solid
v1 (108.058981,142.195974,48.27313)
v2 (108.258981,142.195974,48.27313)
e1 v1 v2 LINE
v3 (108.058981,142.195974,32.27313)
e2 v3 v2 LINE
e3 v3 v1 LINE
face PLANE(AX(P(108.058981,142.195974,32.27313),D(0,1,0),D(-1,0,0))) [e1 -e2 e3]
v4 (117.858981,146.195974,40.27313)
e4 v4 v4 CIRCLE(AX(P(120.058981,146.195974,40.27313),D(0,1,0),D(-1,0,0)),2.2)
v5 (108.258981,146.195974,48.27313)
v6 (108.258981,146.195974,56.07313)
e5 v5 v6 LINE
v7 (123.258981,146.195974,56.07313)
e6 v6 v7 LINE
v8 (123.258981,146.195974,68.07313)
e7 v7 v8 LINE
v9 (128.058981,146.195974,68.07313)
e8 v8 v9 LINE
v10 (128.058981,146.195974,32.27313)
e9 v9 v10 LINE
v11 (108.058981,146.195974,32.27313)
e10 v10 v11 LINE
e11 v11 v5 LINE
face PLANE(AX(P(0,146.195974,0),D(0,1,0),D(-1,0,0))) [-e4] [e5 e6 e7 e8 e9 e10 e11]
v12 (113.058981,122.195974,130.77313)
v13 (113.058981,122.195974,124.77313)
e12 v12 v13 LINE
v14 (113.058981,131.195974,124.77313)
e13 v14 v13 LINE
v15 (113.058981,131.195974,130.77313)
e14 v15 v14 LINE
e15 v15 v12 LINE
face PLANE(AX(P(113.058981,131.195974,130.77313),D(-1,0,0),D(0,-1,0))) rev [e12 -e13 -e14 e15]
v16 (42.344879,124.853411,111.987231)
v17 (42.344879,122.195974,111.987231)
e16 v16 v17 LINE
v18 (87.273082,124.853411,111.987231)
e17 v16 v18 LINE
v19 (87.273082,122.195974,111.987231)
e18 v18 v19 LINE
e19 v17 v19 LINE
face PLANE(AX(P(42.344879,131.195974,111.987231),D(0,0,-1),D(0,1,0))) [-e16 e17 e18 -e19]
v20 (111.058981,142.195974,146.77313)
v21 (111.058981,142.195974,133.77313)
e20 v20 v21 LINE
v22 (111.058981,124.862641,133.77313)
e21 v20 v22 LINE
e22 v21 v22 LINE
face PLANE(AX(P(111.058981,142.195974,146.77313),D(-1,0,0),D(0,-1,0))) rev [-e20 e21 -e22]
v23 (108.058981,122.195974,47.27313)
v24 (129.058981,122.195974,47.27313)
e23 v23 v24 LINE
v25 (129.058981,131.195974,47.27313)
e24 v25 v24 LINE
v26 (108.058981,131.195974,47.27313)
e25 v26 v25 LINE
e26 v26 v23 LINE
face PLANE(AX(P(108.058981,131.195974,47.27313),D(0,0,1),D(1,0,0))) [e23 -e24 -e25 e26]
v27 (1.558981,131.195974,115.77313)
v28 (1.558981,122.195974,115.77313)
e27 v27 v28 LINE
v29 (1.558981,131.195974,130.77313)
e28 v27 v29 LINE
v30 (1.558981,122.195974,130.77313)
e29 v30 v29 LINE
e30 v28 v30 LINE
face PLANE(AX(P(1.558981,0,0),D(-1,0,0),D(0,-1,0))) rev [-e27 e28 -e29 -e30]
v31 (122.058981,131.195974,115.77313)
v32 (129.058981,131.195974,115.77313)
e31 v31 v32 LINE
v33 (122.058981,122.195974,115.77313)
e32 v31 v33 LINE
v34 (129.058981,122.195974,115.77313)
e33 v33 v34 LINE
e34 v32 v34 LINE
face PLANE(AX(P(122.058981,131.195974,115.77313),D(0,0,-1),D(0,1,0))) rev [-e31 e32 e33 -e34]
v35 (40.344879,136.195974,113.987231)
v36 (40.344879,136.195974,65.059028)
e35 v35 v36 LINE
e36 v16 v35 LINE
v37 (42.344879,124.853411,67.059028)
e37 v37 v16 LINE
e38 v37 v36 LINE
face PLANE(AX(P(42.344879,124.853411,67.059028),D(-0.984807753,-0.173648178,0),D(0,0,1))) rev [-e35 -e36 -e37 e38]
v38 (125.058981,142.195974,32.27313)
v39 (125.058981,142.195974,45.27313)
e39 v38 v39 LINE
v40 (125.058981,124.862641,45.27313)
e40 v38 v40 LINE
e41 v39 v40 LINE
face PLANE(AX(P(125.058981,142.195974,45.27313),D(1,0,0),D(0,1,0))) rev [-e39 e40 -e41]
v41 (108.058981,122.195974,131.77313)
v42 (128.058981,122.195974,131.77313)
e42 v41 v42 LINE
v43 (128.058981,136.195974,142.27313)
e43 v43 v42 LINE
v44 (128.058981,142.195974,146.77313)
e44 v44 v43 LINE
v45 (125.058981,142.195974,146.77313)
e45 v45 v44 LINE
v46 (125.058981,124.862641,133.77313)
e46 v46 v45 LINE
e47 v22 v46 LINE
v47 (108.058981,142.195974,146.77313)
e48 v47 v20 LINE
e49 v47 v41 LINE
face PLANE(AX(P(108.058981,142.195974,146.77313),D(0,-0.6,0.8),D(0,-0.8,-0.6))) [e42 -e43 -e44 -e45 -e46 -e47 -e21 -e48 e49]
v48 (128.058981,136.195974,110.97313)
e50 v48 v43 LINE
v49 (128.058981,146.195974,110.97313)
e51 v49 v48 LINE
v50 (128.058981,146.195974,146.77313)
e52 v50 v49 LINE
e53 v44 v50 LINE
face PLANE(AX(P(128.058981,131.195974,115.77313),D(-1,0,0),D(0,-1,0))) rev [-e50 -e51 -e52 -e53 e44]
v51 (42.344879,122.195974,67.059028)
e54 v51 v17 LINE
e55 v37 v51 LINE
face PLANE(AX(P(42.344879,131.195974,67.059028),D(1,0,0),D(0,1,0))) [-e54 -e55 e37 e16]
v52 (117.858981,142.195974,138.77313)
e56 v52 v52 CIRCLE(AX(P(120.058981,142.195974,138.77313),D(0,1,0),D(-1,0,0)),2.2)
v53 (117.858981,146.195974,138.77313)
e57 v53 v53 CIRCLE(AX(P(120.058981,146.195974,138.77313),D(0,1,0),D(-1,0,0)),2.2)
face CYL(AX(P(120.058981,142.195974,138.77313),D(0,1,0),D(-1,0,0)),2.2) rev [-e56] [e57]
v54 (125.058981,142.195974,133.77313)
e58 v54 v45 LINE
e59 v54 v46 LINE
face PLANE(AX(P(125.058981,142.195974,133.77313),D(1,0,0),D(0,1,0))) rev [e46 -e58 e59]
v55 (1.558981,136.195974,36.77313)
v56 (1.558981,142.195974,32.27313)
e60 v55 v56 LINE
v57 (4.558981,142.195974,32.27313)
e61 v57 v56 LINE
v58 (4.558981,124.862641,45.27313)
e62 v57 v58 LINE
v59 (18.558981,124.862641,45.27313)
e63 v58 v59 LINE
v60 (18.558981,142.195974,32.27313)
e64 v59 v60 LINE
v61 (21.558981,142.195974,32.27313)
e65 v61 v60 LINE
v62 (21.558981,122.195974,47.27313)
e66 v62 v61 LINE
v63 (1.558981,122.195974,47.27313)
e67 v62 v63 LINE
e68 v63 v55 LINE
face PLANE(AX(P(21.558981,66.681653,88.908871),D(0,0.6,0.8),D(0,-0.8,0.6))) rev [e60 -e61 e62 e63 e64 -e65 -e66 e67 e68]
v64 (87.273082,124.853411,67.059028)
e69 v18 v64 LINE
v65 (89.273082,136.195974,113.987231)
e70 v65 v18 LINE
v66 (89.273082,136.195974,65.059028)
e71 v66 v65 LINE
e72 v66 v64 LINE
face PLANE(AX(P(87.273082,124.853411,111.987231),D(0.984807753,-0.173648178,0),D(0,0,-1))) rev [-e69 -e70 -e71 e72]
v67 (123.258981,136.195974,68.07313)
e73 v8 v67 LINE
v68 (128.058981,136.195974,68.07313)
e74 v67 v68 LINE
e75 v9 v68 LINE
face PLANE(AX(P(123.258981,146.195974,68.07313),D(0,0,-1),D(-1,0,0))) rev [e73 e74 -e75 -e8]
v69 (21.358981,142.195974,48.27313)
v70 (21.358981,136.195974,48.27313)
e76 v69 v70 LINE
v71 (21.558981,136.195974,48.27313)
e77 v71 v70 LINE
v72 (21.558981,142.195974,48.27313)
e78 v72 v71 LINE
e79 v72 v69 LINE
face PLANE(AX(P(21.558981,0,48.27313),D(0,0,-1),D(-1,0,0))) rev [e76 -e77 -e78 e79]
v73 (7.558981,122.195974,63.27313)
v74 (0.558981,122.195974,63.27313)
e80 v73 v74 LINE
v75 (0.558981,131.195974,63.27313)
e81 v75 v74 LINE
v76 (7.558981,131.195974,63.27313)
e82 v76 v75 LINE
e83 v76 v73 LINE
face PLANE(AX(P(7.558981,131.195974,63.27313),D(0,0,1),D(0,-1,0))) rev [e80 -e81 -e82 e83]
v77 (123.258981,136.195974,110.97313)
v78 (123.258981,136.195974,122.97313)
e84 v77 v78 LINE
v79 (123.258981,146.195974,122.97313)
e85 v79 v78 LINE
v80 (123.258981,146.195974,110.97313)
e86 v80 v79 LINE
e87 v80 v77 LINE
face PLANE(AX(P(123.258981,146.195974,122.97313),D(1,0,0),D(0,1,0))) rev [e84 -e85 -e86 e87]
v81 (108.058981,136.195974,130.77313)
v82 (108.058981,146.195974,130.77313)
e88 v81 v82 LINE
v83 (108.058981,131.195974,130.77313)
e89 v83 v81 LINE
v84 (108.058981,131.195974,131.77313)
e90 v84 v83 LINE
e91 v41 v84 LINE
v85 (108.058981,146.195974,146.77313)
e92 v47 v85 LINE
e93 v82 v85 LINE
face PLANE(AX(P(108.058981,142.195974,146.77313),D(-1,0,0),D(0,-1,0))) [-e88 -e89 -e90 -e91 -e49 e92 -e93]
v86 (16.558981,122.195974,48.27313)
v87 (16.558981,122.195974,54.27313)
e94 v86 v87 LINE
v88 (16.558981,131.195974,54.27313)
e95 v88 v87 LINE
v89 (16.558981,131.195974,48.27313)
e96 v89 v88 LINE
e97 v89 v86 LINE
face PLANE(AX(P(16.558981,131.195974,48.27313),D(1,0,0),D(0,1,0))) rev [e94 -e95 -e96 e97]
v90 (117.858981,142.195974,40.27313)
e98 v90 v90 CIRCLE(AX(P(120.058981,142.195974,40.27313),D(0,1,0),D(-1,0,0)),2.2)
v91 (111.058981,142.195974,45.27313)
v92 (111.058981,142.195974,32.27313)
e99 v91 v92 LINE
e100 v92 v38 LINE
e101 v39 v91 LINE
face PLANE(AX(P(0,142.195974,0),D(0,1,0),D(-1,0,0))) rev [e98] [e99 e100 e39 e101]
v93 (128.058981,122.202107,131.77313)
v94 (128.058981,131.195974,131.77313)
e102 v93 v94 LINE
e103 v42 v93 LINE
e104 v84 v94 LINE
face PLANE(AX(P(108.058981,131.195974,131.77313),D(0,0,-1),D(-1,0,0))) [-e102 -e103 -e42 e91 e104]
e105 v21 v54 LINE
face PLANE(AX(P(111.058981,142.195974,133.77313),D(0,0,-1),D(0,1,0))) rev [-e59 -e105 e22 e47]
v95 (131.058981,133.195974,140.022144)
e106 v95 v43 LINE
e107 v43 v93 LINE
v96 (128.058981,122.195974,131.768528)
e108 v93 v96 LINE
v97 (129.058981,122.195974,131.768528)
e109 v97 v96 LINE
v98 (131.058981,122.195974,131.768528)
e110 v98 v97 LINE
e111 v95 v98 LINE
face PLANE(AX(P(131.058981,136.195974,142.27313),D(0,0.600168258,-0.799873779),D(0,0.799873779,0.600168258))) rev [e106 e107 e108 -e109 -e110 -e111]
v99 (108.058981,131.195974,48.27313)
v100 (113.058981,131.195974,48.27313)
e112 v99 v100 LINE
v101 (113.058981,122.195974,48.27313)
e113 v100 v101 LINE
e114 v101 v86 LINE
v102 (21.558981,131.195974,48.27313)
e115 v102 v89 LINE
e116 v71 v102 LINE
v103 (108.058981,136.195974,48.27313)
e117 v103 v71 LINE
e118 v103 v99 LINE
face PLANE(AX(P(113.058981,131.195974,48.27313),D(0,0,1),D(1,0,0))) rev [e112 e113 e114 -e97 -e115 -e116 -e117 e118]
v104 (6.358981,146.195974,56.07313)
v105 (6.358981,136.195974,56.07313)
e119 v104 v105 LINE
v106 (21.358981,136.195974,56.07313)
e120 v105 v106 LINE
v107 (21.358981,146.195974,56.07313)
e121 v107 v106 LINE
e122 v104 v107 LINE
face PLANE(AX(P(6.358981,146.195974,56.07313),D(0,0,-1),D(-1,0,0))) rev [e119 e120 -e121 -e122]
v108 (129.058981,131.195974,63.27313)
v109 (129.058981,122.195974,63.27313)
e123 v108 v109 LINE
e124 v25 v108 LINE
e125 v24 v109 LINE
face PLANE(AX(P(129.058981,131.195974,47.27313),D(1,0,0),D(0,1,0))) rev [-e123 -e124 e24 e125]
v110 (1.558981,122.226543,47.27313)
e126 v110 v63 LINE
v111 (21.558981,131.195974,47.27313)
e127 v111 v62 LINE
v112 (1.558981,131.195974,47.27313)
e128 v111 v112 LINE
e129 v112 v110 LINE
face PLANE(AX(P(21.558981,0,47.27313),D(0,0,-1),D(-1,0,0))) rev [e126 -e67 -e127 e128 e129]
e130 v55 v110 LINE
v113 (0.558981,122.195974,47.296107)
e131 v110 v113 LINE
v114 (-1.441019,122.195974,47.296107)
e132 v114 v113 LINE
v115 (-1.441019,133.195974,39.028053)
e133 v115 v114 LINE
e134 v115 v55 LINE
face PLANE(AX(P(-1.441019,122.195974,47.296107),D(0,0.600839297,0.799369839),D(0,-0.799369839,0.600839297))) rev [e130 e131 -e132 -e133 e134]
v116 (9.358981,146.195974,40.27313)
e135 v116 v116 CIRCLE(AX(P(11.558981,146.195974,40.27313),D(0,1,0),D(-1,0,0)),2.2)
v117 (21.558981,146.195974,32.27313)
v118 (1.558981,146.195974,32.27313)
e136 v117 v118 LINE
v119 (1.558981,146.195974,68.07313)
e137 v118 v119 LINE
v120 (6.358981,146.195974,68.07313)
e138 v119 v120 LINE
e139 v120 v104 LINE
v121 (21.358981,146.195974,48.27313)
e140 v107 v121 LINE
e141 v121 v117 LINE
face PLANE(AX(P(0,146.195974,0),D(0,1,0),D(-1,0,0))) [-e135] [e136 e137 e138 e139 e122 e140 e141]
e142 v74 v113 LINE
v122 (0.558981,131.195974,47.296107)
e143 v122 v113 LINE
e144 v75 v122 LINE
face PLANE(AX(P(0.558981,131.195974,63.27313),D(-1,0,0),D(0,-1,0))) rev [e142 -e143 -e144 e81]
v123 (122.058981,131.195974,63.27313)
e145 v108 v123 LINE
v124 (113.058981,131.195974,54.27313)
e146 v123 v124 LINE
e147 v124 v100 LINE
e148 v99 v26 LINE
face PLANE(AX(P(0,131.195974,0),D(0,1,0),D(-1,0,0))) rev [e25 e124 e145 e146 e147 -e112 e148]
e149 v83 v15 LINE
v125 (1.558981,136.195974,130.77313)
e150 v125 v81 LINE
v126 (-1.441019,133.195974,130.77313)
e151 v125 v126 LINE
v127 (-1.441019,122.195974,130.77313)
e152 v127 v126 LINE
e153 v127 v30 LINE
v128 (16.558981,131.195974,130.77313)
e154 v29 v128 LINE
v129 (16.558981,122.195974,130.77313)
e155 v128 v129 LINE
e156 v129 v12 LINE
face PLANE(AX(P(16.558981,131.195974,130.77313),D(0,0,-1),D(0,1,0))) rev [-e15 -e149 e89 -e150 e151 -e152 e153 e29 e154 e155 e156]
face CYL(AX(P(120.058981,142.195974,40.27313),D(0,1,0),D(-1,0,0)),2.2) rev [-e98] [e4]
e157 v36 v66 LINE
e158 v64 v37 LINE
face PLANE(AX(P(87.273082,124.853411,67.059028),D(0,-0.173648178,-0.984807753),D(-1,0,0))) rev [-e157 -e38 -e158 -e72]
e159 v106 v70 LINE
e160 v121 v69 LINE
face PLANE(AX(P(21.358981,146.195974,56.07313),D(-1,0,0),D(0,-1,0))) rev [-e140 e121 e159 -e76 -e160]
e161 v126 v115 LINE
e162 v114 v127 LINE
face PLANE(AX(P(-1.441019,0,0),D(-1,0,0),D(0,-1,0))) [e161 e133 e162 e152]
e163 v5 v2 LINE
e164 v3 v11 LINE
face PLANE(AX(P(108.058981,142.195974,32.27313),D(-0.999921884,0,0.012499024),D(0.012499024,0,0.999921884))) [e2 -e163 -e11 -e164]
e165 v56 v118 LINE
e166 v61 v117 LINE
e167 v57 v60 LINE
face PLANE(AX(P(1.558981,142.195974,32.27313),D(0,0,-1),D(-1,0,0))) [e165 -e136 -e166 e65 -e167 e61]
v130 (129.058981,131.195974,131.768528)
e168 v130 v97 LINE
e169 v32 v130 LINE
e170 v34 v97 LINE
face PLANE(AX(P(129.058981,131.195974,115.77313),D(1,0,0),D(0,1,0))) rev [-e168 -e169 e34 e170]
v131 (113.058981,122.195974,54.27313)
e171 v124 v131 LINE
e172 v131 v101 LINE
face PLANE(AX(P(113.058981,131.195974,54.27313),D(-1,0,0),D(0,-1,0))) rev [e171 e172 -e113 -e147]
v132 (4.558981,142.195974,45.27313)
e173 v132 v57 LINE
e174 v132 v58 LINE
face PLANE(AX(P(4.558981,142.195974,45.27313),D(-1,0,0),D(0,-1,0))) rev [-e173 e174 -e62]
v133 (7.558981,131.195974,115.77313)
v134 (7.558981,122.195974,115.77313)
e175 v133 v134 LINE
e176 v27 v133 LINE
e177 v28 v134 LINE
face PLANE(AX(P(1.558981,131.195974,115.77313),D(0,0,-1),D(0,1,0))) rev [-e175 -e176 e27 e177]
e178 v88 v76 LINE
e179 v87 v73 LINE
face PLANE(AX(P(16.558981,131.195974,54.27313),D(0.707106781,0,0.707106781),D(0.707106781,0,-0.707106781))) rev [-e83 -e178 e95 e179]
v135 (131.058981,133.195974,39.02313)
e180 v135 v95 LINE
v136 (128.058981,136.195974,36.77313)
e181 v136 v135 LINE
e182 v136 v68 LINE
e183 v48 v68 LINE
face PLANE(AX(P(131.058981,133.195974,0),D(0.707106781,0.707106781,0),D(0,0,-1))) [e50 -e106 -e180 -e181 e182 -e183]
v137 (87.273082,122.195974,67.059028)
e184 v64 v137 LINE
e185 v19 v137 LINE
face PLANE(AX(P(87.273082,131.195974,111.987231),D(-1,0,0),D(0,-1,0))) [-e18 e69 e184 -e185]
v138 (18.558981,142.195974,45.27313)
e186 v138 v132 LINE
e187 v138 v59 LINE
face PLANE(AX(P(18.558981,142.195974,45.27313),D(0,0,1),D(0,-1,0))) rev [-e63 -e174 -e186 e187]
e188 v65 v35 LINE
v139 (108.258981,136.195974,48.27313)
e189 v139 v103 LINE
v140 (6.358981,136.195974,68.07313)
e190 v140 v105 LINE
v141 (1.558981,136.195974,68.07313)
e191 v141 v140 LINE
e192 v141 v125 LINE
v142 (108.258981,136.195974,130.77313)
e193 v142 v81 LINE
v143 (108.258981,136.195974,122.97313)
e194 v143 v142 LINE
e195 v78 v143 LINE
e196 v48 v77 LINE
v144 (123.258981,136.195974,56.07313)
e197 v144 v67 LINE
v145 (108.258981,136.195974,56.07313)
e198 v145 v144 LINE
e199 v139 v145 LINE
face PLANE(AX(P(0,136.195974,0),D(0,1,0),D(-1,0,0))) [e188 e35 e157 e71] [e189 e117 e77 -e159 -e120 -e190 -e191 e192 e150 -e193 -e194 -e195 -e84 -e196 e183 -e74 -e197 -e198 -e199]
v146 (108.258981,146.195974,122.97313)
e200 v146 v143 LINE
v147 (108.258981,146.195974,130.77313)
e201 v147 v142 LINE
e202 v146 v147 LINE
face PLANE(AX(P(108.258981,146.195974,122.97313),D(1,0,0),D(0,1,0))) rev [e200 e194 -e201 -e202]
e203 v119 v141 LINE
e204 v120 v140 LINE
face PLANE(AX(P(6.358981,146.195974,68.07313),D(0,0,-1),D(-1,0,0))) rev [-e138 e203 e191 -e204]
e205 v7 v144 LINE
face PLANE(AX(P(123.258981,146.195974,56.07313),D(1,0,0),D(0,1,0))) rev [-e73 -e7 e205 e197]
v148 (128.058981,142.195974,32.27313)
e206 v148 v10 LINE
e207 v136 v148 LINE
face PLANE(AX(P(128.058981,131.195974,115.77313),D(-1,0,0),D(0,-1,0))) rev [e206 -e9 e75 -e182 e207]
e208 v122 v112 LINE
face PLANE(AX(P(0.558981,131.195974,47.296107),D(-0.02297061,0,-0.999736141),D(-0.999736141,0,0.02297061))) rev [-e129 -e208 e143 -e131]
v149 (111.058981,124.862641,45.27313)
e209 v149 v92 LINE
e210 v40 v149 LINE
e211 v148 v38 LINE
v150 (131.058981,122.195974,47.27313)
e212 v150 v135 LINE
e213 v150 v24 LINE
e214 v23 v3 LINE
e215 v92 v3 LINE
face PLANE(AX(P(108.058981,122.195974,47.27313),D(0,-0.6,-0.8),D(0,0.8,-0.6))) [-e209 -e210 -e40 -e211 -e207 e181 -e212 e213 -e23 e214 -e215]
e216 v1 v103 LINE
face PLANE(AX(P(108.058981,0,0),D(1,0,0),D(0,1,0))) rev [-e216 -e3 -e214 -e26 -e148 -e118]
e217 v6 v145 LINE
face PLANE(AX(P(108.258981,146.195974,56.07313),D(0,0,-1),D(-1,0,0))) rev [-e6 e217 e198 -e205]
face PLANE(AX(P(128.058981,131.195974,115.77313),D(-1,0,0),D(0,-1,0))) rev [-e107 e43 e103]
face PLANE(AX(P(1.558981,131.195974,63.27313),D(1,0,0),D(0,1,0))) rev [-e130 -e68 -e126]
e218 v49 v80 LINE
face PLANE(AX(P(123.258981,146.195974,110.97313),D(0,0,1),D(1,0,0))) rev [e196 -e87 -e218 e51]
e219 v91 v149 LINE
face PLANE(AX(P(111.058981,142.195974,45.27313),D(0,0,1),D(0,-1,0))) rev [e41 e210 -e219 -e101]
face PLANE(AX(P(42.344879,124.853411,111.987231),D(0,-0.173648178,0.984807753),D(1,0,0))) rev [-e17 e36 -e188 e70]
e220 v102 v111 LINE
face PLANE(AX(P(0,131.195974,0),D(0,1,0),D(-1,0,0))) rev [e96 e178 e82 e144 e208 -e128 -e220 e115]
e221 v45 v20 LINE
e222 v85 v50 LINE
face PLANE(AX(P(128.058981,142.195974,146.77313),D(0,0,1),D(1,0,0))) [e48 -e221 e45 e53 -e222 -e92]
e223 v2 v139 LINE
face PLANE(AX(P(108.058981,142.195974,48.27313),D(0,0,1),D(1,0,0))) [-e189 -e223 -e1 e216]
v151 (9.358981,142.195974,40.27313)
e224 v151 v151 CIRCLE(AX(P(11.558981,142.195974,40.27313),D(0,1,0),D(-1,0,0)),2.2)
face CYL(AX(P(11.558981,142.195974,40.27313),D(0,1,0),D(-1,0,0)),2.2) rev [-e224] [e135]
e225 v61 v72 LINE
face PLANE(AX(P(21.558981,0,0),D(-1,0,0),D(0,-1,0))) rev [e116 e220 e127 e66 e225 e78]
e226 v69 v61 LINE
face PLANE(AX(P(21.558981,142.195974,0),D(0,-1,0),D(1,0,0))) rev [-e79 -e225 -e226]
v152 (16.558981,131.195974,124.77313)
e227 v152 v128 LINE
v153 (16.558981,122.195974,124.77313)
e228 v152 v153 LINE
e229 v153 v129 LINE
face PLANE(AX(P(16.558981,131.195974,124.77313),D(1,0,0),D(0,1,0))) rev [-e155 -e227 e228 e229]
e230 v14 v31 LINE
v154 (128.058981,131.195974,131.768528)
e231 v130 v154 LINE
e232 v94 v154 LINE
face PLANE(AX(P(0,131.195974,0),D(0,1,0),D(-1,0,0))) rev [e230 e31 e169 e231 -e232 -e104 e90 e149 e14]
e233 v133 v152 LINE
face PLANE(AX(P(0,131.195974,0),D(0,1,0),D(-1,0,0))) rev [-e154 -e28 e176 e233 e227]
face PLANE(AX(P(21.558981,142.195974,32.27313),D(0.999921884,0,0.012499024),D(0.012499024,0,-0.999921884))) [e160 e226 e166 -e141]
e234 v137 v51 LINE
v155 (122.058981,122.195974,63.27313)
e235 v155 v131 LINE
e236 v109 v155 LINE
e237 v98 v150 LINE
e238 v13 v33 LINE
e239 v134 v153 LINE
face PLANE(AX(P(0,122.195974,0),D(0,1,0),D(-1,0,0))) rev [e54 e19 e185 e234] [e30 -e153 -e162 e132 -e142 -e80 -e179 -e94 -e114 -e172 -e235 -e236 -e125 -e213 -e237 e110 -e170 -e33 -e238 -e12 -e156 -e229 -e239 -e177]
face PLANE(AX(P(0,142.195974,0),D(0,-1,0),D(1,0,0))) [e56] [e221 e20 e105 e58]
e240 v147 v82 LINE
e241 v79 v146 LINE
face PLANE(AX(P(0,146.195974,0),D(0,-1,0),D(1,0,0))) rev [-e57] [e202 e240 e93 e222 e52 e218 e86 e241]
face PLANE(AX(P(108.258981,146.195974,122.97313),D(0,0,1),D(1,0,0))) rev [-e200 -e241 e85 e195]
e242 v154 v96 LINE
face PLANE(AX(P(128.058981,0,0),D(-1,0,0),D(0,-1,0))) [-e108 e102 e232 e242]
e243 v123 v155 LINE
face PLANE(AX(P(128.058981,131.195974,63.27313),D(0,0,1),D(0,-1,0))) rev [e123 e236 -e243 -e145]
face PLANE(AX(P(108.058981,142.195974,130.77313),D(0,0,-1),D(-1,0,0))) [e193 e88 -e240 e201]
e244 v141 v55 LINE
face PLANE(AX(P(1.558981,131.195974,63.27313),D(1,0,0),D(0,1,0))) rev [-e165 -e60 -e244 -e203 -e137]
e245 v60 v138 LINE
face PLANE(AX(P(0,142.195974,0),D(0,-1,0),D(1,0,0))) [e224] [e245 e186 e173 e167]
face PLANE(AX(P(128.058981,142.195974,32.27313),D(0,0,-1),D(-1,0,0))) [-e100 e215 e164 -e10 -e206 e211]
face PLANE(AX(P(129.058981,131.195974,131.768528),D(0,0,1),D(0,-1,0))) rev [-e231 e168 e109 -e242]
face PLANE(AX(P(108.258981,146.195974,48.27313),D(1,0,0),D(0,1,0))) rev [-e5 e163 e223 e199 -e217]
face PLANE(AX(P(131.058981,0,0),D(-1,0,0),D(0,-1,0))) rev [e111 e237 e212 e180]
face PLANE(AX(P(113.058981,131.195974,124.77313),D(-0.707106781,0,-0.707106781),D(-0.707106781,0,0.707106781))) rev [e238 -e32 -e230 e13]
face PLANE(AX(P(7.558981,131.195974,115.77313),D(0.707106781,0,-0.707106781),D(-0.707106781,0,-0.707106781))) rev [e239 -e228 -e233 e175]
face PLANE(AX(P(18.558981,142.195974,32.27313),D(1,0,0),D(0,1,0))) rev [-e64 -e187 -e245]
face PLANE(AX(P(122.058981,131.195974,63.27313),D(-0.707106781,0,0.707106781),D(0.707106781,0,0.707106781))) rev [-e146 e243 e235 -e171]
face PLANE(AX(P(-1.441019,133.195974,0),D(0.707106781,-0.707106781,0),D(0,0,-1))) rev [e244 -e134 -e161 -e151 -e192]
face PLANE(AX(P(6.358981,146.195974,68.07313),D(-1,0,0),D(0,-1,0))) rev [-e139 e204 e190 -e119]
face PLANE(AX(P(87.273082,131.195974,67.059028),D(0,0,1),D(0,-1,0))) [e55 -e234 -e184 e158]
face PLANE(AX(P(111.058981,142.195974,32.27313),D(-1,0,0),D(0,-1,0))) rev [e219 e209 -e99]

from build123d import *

# Parameters (mm, degrees)
SKETCH_1_W          = 44.92820323
SKETCH_1_H          = 44.928203231
EXTRUDE_1_DEPTH     = 9
SKETCH_2_W          = 126.5
SKETCH_2_H          = 82.5
SKETCH_2_W_2        = 44.92820323
SKETCH_2_H_2        = 44.928203231
EXTRUDE_2_DEPTH     = 5
CHAMFER_1_SIZE      = 2
CHAMFER_1_SIZE2     = 11.342563639
EXTRUDE_3_DEPTH     = 10
SKETCH_4_W          = 20
SKETCH_4_H          = 16
SKETCH_4_R          = 2.2
EXTRUDE_4_DEPTH     = 4
EXTRUDE_5_DEPTH     = 20
EXTRUDE_6_DEPTH     = 20
SKETCH_7_W          = 14
SKETCH_7_H          = 13
CUT_EXTRUDE_1_DEPTH = 20
EXTRUDE_7_DEPTH     = 3
EXTRUDE_8_DEPTH     = 3
CHAMFER_2_SIZE      = 3
SKETCH_10_W         = 1
SKETCH_10_H         = 16
SKETCH_10_H_2       = 15.995398116
CUT_EXTRUDE_2_DEPTH = 9


with BuildPart() as part:
    # Эскиз1 → Бобышка-Вытянуть1 (new body)
    with BuildSketch(Plane(origin=(0, 122.195974268, 0), x_dir=(1, 0, 0), z_dir=(0, 1, 0))):
        Polygon((16.558980694, -48.273129836), (16.558980694, -54.273129836), (7.558980694, -63.273129836), (1.558980694, -63.273129836), (1.558980694, -115.773129836), (7.558980694, -115.773129836), (16.558980694, -124.773129836), (16.558980694, -130.773129836), (113.058980694, -130.773129836), (113.058980694, -124.773129836), (122.058980694, -115.773129836), (128.058980694, -115.773129836), (128.058980694, -63.273129836), (122.058980694, -63.273129836), (113.058980694, -54.273129836), (113.058980694, -48.273129836), align=None)
        with Locations((64.808980694, -89.523129837)):
            Rectangle(SKETCH_1_W, SKETCH_1_H, mode=Mode.SUBTRACT)
    extrude(amount=EXTRUDE_1_DEPTH)

    # Эскиз2 → Бобышка-Вытянуть2 (add)
    with BuildSketch(Plane(origin=(0, 131.195974268, 0), x_dir=(1, 0, 0), z_dir=(0, 1, 0))):
        with Locations((64.808980694, -89.523129836)):
            Rectangle(SKETCH_2_W, SKETCH_2_H)
        with Locations((64.808980694, -89.523129837)):
            Rectangle(SKETCH_2_W_2, SKETCH_2_H_2, mode=Mode.SUBTRACT)
    extrude(amount=EXTRUDE_2_DEPTH)

    # Фаска1
    chamfer_1_edges = [part.edges().sort_by_distance(p)[0] for p in [
        (64.808980694, 136.195974268, 67.059028221),
        (42.344879079, 136.195974268, 89.523129836),
        (64.808980694, 136.195974268, 111.987231452),
        (87.273082309, 136.195974268, 89.523129836),
    ]]
    chamfer_1_side = [part.faces().sort_by_distance(p)[0] for p in [
        (64.808980694, 136.195974268, 49.78337816),
    ]]
    chamfer(chamfer_1_edges, length=CHAMFER_1_SIZE, length2=CHAMFER_1_SIZE2, reference=chamfer_1_side[0])

    # Эскиз3 → Бобышка-Вытянуть3 (add)
    with BuildSketch(Plane(origin=(0, 136.195974268, 0), x_dir=(1, 0, 0), z_dir=(0, 1, 0))):
        Polygon((128.058980694, -68.073129836), (128.058980694, -48.273129836), (108.258980694, -48.273129836), (108.258980694, -56.073129836), (123.258980694, -56.073129836), (123.258980694, -68.073129836), align=None)
        Polygon((21.358980694, -48.273129836), (1.558980694, -48.273129836), (1.558980694, -68.073129836), (6.358980694, -68.073129836), (6.358980694, -56.073129836), (21.358980694, -56.073129836), align=None)
        Polygon((128.058980694, -110.973129836), (128.058980694, -130.773129836), (108.258980694, -130.773129836), (108.258980694, -122.973129836), (123.258980694, -122.973129836), (123.258980694, -110.973129836), align=None)
    extrude(amount=EXTRUDE_3_DEPTH)

    # Эскиз4 → Бобышка-Вытянуть4 (add)
    # profile 1 of 3: a face of its own
    with BuildSketch(Plane(origin=(0, 146.195974268, 0), x_dir=(1, 0, 0), z_dir=(0, 1, 0))):
        with Locations((118.058980694, -138.773129836)):
            Rectangle(SKETCH_4_W, SKETCH_4_H)
        with Locations(Location((120.058980694, -138.773129836, 0), (0, 0, 180))):
            Circle(SKETCH_4_R, mode=Mode.SUBTRACT)
    # profile 2 of 3: a face of its own
    with BuildSketch(Plane(origin=(0, 146.195974268, 0), x_dir=(1, 0, 0), z_dir=(0, 1, 0))):
        Polygon((128.058980694, -48.273129836), (128.058980694, -32.273129836), (108.058980694, -32.273129836), (108.258980694, -48.273129836), align=None)
        with Locations(Location((120.058980694, -40.273129836, 0), (0, 0, 180))):
            Circle(SKETCH_4_R, mode=Mode.SUBTRACT)
    # profile 3 of 3: a face of its own
    with BuildSketch(Plane(origin=(0, 146.195974268, 0), x_dir=(1, 0, 0), z_dir=(0, 1, 0))):
        Polygon((1.558980694, -48.273129836), (1.558980694, -32.273129836), (21.558980694, -32.273129836), (21.358980694, -48.273129836), align=None)
        with Locations(Location((11.558980694, -40.273129836, 0), (0, 0, 180))):
            Circle(SKETCH_4_R, mode=Mode.SUBTRACT)
    extrude(amount=-EXTRUDE_4_DEPTH)

    # Эскиз5 → Бобышка-Вытянуть5 (add)
    with BuildSketch(Plane(origin=(128.058980694, 0, 0), x_dir=(0, 0, -1), z_dir=(1, 0, 0))):
        Polygon((-146.773129836, 142.195974268), (-130.773129836, 142.195974268), (-130.773129836, 131.195974268), (-131.773129836, 131.195974268), (-131.773129836, 122.195974268), align=None)
        Polygon((-32.273129836, 142.195974268), (-48.273129836, 142.195974268), (-48.273129836, 131.195974268), (-47.273129836, 131.195974268), (-47.273129836, 122.195974268), align=None)
    extrude(amount=-EXTRUDE_5_DEPTH)

    # Эскиз6 → Бобышка-Вытянуть6 (add)
    with BuildSketch(Plane.ZY.offset(-1.558980694)):
        Polygon((32.273129836, 142.195974268), (48.273129836, 142.195974268), (48.273129836, 131.195974268), (47.273129836, 131.195974268), (47.273129836, 122.195974268), align=None)
    extrude(amount=-EXTRUDE_6_DEPTH)

    # Эскиз7 → Вырез-Вытянуть1 (cut)
    with BuildSketch(Plane(origin=(0, 122.195974268, 0), x_dir=(-1, 0, 0), z_dir=(0, -1, 0))):
        with Locations((-11.558980694, -38.773129836)):
            Rectangle(SKETCH_7_W, SKETCH_7_H)
        with Locations((-118.058980694, -38.773129836)):
            Rectangle(SKETCH_7_W, SKETCH_7_H)
        with Locations((-118.058980694, -140.273129836)):
            Rectangle(SKETCH_7_W, SKETCH_7_H)
    extrude(amount=-CUT_EXTRUDE_1_DEPTH, mode=Mode.SUBTRACT)

    # Эскиз8 → Бобышка-Вытянуть7 (add)
    with BuildSketch(Plane(origin=(128.058980694, 0, 0), x_dir=(0, 0, -1), z_dir=(1, 0, 0))):
        Polygon((-142.273129836, 136.195974268), (-36.773129836, 136.195974268), (-47.273129836, 122.195974268), (-131.768527952, 122.195974268), align=None)
    extrude(amount=EXTRUDE_7_DEPTH)

    # Эскиз9 → Бобышка-Вытянуть8 (add)
    with BuildSketch(Plane.ZY.offset(-1.558980694)):
        Polygon((47.296106509, 122.195974268), (36.773129836, 136.195974268), (130.773129836, 136.195974268), (130.773129836, 122.195974268), align=None)
    extrude(amount=EXTRUDE_8_DEPTH)

    # Фаска2
    chamfer_2_edges = [part.edges().sort_by_distance(p)[0] for p in [
        (131.058980694, 136.195974268, 89.523129836),
        (-1.441019306, 136.195974268, 83.773129836),
    ]]
    chamfer(chamfer_2_edges, length=CHAMFER_2_SIZE - 0.0001)  # a hair under: the kernel refuses the full size

    # Эскиз10 → Вырез-Вытянуть2 (cut)
    with BuildSketch(Plane(origin=(0, 122.195974268, 0), x_dir=(-1, 0, 0), z_dir=(0, -1, 0))):
        with Locations((-128.558980694, -55.273129836)):
            Rectangle(SKETCH_10_W, SKETCH_10_H)
        with Locations((-128.558980694, -123.770828894)):
            Rectangle(SKETCH_10_W, SKETCH_10_H_2)
        Polygon((-1.558980694, -47.273129836), (-1.558980694, -63.273129836), (-0.558980694, -63.273129836), (-0.558980694, -47.296106509), align=None)
    extrude(amount=-CUT_EXTRUDE_2_DEPTH, mode=Mode.SUBTRACT)


solid = part.part
